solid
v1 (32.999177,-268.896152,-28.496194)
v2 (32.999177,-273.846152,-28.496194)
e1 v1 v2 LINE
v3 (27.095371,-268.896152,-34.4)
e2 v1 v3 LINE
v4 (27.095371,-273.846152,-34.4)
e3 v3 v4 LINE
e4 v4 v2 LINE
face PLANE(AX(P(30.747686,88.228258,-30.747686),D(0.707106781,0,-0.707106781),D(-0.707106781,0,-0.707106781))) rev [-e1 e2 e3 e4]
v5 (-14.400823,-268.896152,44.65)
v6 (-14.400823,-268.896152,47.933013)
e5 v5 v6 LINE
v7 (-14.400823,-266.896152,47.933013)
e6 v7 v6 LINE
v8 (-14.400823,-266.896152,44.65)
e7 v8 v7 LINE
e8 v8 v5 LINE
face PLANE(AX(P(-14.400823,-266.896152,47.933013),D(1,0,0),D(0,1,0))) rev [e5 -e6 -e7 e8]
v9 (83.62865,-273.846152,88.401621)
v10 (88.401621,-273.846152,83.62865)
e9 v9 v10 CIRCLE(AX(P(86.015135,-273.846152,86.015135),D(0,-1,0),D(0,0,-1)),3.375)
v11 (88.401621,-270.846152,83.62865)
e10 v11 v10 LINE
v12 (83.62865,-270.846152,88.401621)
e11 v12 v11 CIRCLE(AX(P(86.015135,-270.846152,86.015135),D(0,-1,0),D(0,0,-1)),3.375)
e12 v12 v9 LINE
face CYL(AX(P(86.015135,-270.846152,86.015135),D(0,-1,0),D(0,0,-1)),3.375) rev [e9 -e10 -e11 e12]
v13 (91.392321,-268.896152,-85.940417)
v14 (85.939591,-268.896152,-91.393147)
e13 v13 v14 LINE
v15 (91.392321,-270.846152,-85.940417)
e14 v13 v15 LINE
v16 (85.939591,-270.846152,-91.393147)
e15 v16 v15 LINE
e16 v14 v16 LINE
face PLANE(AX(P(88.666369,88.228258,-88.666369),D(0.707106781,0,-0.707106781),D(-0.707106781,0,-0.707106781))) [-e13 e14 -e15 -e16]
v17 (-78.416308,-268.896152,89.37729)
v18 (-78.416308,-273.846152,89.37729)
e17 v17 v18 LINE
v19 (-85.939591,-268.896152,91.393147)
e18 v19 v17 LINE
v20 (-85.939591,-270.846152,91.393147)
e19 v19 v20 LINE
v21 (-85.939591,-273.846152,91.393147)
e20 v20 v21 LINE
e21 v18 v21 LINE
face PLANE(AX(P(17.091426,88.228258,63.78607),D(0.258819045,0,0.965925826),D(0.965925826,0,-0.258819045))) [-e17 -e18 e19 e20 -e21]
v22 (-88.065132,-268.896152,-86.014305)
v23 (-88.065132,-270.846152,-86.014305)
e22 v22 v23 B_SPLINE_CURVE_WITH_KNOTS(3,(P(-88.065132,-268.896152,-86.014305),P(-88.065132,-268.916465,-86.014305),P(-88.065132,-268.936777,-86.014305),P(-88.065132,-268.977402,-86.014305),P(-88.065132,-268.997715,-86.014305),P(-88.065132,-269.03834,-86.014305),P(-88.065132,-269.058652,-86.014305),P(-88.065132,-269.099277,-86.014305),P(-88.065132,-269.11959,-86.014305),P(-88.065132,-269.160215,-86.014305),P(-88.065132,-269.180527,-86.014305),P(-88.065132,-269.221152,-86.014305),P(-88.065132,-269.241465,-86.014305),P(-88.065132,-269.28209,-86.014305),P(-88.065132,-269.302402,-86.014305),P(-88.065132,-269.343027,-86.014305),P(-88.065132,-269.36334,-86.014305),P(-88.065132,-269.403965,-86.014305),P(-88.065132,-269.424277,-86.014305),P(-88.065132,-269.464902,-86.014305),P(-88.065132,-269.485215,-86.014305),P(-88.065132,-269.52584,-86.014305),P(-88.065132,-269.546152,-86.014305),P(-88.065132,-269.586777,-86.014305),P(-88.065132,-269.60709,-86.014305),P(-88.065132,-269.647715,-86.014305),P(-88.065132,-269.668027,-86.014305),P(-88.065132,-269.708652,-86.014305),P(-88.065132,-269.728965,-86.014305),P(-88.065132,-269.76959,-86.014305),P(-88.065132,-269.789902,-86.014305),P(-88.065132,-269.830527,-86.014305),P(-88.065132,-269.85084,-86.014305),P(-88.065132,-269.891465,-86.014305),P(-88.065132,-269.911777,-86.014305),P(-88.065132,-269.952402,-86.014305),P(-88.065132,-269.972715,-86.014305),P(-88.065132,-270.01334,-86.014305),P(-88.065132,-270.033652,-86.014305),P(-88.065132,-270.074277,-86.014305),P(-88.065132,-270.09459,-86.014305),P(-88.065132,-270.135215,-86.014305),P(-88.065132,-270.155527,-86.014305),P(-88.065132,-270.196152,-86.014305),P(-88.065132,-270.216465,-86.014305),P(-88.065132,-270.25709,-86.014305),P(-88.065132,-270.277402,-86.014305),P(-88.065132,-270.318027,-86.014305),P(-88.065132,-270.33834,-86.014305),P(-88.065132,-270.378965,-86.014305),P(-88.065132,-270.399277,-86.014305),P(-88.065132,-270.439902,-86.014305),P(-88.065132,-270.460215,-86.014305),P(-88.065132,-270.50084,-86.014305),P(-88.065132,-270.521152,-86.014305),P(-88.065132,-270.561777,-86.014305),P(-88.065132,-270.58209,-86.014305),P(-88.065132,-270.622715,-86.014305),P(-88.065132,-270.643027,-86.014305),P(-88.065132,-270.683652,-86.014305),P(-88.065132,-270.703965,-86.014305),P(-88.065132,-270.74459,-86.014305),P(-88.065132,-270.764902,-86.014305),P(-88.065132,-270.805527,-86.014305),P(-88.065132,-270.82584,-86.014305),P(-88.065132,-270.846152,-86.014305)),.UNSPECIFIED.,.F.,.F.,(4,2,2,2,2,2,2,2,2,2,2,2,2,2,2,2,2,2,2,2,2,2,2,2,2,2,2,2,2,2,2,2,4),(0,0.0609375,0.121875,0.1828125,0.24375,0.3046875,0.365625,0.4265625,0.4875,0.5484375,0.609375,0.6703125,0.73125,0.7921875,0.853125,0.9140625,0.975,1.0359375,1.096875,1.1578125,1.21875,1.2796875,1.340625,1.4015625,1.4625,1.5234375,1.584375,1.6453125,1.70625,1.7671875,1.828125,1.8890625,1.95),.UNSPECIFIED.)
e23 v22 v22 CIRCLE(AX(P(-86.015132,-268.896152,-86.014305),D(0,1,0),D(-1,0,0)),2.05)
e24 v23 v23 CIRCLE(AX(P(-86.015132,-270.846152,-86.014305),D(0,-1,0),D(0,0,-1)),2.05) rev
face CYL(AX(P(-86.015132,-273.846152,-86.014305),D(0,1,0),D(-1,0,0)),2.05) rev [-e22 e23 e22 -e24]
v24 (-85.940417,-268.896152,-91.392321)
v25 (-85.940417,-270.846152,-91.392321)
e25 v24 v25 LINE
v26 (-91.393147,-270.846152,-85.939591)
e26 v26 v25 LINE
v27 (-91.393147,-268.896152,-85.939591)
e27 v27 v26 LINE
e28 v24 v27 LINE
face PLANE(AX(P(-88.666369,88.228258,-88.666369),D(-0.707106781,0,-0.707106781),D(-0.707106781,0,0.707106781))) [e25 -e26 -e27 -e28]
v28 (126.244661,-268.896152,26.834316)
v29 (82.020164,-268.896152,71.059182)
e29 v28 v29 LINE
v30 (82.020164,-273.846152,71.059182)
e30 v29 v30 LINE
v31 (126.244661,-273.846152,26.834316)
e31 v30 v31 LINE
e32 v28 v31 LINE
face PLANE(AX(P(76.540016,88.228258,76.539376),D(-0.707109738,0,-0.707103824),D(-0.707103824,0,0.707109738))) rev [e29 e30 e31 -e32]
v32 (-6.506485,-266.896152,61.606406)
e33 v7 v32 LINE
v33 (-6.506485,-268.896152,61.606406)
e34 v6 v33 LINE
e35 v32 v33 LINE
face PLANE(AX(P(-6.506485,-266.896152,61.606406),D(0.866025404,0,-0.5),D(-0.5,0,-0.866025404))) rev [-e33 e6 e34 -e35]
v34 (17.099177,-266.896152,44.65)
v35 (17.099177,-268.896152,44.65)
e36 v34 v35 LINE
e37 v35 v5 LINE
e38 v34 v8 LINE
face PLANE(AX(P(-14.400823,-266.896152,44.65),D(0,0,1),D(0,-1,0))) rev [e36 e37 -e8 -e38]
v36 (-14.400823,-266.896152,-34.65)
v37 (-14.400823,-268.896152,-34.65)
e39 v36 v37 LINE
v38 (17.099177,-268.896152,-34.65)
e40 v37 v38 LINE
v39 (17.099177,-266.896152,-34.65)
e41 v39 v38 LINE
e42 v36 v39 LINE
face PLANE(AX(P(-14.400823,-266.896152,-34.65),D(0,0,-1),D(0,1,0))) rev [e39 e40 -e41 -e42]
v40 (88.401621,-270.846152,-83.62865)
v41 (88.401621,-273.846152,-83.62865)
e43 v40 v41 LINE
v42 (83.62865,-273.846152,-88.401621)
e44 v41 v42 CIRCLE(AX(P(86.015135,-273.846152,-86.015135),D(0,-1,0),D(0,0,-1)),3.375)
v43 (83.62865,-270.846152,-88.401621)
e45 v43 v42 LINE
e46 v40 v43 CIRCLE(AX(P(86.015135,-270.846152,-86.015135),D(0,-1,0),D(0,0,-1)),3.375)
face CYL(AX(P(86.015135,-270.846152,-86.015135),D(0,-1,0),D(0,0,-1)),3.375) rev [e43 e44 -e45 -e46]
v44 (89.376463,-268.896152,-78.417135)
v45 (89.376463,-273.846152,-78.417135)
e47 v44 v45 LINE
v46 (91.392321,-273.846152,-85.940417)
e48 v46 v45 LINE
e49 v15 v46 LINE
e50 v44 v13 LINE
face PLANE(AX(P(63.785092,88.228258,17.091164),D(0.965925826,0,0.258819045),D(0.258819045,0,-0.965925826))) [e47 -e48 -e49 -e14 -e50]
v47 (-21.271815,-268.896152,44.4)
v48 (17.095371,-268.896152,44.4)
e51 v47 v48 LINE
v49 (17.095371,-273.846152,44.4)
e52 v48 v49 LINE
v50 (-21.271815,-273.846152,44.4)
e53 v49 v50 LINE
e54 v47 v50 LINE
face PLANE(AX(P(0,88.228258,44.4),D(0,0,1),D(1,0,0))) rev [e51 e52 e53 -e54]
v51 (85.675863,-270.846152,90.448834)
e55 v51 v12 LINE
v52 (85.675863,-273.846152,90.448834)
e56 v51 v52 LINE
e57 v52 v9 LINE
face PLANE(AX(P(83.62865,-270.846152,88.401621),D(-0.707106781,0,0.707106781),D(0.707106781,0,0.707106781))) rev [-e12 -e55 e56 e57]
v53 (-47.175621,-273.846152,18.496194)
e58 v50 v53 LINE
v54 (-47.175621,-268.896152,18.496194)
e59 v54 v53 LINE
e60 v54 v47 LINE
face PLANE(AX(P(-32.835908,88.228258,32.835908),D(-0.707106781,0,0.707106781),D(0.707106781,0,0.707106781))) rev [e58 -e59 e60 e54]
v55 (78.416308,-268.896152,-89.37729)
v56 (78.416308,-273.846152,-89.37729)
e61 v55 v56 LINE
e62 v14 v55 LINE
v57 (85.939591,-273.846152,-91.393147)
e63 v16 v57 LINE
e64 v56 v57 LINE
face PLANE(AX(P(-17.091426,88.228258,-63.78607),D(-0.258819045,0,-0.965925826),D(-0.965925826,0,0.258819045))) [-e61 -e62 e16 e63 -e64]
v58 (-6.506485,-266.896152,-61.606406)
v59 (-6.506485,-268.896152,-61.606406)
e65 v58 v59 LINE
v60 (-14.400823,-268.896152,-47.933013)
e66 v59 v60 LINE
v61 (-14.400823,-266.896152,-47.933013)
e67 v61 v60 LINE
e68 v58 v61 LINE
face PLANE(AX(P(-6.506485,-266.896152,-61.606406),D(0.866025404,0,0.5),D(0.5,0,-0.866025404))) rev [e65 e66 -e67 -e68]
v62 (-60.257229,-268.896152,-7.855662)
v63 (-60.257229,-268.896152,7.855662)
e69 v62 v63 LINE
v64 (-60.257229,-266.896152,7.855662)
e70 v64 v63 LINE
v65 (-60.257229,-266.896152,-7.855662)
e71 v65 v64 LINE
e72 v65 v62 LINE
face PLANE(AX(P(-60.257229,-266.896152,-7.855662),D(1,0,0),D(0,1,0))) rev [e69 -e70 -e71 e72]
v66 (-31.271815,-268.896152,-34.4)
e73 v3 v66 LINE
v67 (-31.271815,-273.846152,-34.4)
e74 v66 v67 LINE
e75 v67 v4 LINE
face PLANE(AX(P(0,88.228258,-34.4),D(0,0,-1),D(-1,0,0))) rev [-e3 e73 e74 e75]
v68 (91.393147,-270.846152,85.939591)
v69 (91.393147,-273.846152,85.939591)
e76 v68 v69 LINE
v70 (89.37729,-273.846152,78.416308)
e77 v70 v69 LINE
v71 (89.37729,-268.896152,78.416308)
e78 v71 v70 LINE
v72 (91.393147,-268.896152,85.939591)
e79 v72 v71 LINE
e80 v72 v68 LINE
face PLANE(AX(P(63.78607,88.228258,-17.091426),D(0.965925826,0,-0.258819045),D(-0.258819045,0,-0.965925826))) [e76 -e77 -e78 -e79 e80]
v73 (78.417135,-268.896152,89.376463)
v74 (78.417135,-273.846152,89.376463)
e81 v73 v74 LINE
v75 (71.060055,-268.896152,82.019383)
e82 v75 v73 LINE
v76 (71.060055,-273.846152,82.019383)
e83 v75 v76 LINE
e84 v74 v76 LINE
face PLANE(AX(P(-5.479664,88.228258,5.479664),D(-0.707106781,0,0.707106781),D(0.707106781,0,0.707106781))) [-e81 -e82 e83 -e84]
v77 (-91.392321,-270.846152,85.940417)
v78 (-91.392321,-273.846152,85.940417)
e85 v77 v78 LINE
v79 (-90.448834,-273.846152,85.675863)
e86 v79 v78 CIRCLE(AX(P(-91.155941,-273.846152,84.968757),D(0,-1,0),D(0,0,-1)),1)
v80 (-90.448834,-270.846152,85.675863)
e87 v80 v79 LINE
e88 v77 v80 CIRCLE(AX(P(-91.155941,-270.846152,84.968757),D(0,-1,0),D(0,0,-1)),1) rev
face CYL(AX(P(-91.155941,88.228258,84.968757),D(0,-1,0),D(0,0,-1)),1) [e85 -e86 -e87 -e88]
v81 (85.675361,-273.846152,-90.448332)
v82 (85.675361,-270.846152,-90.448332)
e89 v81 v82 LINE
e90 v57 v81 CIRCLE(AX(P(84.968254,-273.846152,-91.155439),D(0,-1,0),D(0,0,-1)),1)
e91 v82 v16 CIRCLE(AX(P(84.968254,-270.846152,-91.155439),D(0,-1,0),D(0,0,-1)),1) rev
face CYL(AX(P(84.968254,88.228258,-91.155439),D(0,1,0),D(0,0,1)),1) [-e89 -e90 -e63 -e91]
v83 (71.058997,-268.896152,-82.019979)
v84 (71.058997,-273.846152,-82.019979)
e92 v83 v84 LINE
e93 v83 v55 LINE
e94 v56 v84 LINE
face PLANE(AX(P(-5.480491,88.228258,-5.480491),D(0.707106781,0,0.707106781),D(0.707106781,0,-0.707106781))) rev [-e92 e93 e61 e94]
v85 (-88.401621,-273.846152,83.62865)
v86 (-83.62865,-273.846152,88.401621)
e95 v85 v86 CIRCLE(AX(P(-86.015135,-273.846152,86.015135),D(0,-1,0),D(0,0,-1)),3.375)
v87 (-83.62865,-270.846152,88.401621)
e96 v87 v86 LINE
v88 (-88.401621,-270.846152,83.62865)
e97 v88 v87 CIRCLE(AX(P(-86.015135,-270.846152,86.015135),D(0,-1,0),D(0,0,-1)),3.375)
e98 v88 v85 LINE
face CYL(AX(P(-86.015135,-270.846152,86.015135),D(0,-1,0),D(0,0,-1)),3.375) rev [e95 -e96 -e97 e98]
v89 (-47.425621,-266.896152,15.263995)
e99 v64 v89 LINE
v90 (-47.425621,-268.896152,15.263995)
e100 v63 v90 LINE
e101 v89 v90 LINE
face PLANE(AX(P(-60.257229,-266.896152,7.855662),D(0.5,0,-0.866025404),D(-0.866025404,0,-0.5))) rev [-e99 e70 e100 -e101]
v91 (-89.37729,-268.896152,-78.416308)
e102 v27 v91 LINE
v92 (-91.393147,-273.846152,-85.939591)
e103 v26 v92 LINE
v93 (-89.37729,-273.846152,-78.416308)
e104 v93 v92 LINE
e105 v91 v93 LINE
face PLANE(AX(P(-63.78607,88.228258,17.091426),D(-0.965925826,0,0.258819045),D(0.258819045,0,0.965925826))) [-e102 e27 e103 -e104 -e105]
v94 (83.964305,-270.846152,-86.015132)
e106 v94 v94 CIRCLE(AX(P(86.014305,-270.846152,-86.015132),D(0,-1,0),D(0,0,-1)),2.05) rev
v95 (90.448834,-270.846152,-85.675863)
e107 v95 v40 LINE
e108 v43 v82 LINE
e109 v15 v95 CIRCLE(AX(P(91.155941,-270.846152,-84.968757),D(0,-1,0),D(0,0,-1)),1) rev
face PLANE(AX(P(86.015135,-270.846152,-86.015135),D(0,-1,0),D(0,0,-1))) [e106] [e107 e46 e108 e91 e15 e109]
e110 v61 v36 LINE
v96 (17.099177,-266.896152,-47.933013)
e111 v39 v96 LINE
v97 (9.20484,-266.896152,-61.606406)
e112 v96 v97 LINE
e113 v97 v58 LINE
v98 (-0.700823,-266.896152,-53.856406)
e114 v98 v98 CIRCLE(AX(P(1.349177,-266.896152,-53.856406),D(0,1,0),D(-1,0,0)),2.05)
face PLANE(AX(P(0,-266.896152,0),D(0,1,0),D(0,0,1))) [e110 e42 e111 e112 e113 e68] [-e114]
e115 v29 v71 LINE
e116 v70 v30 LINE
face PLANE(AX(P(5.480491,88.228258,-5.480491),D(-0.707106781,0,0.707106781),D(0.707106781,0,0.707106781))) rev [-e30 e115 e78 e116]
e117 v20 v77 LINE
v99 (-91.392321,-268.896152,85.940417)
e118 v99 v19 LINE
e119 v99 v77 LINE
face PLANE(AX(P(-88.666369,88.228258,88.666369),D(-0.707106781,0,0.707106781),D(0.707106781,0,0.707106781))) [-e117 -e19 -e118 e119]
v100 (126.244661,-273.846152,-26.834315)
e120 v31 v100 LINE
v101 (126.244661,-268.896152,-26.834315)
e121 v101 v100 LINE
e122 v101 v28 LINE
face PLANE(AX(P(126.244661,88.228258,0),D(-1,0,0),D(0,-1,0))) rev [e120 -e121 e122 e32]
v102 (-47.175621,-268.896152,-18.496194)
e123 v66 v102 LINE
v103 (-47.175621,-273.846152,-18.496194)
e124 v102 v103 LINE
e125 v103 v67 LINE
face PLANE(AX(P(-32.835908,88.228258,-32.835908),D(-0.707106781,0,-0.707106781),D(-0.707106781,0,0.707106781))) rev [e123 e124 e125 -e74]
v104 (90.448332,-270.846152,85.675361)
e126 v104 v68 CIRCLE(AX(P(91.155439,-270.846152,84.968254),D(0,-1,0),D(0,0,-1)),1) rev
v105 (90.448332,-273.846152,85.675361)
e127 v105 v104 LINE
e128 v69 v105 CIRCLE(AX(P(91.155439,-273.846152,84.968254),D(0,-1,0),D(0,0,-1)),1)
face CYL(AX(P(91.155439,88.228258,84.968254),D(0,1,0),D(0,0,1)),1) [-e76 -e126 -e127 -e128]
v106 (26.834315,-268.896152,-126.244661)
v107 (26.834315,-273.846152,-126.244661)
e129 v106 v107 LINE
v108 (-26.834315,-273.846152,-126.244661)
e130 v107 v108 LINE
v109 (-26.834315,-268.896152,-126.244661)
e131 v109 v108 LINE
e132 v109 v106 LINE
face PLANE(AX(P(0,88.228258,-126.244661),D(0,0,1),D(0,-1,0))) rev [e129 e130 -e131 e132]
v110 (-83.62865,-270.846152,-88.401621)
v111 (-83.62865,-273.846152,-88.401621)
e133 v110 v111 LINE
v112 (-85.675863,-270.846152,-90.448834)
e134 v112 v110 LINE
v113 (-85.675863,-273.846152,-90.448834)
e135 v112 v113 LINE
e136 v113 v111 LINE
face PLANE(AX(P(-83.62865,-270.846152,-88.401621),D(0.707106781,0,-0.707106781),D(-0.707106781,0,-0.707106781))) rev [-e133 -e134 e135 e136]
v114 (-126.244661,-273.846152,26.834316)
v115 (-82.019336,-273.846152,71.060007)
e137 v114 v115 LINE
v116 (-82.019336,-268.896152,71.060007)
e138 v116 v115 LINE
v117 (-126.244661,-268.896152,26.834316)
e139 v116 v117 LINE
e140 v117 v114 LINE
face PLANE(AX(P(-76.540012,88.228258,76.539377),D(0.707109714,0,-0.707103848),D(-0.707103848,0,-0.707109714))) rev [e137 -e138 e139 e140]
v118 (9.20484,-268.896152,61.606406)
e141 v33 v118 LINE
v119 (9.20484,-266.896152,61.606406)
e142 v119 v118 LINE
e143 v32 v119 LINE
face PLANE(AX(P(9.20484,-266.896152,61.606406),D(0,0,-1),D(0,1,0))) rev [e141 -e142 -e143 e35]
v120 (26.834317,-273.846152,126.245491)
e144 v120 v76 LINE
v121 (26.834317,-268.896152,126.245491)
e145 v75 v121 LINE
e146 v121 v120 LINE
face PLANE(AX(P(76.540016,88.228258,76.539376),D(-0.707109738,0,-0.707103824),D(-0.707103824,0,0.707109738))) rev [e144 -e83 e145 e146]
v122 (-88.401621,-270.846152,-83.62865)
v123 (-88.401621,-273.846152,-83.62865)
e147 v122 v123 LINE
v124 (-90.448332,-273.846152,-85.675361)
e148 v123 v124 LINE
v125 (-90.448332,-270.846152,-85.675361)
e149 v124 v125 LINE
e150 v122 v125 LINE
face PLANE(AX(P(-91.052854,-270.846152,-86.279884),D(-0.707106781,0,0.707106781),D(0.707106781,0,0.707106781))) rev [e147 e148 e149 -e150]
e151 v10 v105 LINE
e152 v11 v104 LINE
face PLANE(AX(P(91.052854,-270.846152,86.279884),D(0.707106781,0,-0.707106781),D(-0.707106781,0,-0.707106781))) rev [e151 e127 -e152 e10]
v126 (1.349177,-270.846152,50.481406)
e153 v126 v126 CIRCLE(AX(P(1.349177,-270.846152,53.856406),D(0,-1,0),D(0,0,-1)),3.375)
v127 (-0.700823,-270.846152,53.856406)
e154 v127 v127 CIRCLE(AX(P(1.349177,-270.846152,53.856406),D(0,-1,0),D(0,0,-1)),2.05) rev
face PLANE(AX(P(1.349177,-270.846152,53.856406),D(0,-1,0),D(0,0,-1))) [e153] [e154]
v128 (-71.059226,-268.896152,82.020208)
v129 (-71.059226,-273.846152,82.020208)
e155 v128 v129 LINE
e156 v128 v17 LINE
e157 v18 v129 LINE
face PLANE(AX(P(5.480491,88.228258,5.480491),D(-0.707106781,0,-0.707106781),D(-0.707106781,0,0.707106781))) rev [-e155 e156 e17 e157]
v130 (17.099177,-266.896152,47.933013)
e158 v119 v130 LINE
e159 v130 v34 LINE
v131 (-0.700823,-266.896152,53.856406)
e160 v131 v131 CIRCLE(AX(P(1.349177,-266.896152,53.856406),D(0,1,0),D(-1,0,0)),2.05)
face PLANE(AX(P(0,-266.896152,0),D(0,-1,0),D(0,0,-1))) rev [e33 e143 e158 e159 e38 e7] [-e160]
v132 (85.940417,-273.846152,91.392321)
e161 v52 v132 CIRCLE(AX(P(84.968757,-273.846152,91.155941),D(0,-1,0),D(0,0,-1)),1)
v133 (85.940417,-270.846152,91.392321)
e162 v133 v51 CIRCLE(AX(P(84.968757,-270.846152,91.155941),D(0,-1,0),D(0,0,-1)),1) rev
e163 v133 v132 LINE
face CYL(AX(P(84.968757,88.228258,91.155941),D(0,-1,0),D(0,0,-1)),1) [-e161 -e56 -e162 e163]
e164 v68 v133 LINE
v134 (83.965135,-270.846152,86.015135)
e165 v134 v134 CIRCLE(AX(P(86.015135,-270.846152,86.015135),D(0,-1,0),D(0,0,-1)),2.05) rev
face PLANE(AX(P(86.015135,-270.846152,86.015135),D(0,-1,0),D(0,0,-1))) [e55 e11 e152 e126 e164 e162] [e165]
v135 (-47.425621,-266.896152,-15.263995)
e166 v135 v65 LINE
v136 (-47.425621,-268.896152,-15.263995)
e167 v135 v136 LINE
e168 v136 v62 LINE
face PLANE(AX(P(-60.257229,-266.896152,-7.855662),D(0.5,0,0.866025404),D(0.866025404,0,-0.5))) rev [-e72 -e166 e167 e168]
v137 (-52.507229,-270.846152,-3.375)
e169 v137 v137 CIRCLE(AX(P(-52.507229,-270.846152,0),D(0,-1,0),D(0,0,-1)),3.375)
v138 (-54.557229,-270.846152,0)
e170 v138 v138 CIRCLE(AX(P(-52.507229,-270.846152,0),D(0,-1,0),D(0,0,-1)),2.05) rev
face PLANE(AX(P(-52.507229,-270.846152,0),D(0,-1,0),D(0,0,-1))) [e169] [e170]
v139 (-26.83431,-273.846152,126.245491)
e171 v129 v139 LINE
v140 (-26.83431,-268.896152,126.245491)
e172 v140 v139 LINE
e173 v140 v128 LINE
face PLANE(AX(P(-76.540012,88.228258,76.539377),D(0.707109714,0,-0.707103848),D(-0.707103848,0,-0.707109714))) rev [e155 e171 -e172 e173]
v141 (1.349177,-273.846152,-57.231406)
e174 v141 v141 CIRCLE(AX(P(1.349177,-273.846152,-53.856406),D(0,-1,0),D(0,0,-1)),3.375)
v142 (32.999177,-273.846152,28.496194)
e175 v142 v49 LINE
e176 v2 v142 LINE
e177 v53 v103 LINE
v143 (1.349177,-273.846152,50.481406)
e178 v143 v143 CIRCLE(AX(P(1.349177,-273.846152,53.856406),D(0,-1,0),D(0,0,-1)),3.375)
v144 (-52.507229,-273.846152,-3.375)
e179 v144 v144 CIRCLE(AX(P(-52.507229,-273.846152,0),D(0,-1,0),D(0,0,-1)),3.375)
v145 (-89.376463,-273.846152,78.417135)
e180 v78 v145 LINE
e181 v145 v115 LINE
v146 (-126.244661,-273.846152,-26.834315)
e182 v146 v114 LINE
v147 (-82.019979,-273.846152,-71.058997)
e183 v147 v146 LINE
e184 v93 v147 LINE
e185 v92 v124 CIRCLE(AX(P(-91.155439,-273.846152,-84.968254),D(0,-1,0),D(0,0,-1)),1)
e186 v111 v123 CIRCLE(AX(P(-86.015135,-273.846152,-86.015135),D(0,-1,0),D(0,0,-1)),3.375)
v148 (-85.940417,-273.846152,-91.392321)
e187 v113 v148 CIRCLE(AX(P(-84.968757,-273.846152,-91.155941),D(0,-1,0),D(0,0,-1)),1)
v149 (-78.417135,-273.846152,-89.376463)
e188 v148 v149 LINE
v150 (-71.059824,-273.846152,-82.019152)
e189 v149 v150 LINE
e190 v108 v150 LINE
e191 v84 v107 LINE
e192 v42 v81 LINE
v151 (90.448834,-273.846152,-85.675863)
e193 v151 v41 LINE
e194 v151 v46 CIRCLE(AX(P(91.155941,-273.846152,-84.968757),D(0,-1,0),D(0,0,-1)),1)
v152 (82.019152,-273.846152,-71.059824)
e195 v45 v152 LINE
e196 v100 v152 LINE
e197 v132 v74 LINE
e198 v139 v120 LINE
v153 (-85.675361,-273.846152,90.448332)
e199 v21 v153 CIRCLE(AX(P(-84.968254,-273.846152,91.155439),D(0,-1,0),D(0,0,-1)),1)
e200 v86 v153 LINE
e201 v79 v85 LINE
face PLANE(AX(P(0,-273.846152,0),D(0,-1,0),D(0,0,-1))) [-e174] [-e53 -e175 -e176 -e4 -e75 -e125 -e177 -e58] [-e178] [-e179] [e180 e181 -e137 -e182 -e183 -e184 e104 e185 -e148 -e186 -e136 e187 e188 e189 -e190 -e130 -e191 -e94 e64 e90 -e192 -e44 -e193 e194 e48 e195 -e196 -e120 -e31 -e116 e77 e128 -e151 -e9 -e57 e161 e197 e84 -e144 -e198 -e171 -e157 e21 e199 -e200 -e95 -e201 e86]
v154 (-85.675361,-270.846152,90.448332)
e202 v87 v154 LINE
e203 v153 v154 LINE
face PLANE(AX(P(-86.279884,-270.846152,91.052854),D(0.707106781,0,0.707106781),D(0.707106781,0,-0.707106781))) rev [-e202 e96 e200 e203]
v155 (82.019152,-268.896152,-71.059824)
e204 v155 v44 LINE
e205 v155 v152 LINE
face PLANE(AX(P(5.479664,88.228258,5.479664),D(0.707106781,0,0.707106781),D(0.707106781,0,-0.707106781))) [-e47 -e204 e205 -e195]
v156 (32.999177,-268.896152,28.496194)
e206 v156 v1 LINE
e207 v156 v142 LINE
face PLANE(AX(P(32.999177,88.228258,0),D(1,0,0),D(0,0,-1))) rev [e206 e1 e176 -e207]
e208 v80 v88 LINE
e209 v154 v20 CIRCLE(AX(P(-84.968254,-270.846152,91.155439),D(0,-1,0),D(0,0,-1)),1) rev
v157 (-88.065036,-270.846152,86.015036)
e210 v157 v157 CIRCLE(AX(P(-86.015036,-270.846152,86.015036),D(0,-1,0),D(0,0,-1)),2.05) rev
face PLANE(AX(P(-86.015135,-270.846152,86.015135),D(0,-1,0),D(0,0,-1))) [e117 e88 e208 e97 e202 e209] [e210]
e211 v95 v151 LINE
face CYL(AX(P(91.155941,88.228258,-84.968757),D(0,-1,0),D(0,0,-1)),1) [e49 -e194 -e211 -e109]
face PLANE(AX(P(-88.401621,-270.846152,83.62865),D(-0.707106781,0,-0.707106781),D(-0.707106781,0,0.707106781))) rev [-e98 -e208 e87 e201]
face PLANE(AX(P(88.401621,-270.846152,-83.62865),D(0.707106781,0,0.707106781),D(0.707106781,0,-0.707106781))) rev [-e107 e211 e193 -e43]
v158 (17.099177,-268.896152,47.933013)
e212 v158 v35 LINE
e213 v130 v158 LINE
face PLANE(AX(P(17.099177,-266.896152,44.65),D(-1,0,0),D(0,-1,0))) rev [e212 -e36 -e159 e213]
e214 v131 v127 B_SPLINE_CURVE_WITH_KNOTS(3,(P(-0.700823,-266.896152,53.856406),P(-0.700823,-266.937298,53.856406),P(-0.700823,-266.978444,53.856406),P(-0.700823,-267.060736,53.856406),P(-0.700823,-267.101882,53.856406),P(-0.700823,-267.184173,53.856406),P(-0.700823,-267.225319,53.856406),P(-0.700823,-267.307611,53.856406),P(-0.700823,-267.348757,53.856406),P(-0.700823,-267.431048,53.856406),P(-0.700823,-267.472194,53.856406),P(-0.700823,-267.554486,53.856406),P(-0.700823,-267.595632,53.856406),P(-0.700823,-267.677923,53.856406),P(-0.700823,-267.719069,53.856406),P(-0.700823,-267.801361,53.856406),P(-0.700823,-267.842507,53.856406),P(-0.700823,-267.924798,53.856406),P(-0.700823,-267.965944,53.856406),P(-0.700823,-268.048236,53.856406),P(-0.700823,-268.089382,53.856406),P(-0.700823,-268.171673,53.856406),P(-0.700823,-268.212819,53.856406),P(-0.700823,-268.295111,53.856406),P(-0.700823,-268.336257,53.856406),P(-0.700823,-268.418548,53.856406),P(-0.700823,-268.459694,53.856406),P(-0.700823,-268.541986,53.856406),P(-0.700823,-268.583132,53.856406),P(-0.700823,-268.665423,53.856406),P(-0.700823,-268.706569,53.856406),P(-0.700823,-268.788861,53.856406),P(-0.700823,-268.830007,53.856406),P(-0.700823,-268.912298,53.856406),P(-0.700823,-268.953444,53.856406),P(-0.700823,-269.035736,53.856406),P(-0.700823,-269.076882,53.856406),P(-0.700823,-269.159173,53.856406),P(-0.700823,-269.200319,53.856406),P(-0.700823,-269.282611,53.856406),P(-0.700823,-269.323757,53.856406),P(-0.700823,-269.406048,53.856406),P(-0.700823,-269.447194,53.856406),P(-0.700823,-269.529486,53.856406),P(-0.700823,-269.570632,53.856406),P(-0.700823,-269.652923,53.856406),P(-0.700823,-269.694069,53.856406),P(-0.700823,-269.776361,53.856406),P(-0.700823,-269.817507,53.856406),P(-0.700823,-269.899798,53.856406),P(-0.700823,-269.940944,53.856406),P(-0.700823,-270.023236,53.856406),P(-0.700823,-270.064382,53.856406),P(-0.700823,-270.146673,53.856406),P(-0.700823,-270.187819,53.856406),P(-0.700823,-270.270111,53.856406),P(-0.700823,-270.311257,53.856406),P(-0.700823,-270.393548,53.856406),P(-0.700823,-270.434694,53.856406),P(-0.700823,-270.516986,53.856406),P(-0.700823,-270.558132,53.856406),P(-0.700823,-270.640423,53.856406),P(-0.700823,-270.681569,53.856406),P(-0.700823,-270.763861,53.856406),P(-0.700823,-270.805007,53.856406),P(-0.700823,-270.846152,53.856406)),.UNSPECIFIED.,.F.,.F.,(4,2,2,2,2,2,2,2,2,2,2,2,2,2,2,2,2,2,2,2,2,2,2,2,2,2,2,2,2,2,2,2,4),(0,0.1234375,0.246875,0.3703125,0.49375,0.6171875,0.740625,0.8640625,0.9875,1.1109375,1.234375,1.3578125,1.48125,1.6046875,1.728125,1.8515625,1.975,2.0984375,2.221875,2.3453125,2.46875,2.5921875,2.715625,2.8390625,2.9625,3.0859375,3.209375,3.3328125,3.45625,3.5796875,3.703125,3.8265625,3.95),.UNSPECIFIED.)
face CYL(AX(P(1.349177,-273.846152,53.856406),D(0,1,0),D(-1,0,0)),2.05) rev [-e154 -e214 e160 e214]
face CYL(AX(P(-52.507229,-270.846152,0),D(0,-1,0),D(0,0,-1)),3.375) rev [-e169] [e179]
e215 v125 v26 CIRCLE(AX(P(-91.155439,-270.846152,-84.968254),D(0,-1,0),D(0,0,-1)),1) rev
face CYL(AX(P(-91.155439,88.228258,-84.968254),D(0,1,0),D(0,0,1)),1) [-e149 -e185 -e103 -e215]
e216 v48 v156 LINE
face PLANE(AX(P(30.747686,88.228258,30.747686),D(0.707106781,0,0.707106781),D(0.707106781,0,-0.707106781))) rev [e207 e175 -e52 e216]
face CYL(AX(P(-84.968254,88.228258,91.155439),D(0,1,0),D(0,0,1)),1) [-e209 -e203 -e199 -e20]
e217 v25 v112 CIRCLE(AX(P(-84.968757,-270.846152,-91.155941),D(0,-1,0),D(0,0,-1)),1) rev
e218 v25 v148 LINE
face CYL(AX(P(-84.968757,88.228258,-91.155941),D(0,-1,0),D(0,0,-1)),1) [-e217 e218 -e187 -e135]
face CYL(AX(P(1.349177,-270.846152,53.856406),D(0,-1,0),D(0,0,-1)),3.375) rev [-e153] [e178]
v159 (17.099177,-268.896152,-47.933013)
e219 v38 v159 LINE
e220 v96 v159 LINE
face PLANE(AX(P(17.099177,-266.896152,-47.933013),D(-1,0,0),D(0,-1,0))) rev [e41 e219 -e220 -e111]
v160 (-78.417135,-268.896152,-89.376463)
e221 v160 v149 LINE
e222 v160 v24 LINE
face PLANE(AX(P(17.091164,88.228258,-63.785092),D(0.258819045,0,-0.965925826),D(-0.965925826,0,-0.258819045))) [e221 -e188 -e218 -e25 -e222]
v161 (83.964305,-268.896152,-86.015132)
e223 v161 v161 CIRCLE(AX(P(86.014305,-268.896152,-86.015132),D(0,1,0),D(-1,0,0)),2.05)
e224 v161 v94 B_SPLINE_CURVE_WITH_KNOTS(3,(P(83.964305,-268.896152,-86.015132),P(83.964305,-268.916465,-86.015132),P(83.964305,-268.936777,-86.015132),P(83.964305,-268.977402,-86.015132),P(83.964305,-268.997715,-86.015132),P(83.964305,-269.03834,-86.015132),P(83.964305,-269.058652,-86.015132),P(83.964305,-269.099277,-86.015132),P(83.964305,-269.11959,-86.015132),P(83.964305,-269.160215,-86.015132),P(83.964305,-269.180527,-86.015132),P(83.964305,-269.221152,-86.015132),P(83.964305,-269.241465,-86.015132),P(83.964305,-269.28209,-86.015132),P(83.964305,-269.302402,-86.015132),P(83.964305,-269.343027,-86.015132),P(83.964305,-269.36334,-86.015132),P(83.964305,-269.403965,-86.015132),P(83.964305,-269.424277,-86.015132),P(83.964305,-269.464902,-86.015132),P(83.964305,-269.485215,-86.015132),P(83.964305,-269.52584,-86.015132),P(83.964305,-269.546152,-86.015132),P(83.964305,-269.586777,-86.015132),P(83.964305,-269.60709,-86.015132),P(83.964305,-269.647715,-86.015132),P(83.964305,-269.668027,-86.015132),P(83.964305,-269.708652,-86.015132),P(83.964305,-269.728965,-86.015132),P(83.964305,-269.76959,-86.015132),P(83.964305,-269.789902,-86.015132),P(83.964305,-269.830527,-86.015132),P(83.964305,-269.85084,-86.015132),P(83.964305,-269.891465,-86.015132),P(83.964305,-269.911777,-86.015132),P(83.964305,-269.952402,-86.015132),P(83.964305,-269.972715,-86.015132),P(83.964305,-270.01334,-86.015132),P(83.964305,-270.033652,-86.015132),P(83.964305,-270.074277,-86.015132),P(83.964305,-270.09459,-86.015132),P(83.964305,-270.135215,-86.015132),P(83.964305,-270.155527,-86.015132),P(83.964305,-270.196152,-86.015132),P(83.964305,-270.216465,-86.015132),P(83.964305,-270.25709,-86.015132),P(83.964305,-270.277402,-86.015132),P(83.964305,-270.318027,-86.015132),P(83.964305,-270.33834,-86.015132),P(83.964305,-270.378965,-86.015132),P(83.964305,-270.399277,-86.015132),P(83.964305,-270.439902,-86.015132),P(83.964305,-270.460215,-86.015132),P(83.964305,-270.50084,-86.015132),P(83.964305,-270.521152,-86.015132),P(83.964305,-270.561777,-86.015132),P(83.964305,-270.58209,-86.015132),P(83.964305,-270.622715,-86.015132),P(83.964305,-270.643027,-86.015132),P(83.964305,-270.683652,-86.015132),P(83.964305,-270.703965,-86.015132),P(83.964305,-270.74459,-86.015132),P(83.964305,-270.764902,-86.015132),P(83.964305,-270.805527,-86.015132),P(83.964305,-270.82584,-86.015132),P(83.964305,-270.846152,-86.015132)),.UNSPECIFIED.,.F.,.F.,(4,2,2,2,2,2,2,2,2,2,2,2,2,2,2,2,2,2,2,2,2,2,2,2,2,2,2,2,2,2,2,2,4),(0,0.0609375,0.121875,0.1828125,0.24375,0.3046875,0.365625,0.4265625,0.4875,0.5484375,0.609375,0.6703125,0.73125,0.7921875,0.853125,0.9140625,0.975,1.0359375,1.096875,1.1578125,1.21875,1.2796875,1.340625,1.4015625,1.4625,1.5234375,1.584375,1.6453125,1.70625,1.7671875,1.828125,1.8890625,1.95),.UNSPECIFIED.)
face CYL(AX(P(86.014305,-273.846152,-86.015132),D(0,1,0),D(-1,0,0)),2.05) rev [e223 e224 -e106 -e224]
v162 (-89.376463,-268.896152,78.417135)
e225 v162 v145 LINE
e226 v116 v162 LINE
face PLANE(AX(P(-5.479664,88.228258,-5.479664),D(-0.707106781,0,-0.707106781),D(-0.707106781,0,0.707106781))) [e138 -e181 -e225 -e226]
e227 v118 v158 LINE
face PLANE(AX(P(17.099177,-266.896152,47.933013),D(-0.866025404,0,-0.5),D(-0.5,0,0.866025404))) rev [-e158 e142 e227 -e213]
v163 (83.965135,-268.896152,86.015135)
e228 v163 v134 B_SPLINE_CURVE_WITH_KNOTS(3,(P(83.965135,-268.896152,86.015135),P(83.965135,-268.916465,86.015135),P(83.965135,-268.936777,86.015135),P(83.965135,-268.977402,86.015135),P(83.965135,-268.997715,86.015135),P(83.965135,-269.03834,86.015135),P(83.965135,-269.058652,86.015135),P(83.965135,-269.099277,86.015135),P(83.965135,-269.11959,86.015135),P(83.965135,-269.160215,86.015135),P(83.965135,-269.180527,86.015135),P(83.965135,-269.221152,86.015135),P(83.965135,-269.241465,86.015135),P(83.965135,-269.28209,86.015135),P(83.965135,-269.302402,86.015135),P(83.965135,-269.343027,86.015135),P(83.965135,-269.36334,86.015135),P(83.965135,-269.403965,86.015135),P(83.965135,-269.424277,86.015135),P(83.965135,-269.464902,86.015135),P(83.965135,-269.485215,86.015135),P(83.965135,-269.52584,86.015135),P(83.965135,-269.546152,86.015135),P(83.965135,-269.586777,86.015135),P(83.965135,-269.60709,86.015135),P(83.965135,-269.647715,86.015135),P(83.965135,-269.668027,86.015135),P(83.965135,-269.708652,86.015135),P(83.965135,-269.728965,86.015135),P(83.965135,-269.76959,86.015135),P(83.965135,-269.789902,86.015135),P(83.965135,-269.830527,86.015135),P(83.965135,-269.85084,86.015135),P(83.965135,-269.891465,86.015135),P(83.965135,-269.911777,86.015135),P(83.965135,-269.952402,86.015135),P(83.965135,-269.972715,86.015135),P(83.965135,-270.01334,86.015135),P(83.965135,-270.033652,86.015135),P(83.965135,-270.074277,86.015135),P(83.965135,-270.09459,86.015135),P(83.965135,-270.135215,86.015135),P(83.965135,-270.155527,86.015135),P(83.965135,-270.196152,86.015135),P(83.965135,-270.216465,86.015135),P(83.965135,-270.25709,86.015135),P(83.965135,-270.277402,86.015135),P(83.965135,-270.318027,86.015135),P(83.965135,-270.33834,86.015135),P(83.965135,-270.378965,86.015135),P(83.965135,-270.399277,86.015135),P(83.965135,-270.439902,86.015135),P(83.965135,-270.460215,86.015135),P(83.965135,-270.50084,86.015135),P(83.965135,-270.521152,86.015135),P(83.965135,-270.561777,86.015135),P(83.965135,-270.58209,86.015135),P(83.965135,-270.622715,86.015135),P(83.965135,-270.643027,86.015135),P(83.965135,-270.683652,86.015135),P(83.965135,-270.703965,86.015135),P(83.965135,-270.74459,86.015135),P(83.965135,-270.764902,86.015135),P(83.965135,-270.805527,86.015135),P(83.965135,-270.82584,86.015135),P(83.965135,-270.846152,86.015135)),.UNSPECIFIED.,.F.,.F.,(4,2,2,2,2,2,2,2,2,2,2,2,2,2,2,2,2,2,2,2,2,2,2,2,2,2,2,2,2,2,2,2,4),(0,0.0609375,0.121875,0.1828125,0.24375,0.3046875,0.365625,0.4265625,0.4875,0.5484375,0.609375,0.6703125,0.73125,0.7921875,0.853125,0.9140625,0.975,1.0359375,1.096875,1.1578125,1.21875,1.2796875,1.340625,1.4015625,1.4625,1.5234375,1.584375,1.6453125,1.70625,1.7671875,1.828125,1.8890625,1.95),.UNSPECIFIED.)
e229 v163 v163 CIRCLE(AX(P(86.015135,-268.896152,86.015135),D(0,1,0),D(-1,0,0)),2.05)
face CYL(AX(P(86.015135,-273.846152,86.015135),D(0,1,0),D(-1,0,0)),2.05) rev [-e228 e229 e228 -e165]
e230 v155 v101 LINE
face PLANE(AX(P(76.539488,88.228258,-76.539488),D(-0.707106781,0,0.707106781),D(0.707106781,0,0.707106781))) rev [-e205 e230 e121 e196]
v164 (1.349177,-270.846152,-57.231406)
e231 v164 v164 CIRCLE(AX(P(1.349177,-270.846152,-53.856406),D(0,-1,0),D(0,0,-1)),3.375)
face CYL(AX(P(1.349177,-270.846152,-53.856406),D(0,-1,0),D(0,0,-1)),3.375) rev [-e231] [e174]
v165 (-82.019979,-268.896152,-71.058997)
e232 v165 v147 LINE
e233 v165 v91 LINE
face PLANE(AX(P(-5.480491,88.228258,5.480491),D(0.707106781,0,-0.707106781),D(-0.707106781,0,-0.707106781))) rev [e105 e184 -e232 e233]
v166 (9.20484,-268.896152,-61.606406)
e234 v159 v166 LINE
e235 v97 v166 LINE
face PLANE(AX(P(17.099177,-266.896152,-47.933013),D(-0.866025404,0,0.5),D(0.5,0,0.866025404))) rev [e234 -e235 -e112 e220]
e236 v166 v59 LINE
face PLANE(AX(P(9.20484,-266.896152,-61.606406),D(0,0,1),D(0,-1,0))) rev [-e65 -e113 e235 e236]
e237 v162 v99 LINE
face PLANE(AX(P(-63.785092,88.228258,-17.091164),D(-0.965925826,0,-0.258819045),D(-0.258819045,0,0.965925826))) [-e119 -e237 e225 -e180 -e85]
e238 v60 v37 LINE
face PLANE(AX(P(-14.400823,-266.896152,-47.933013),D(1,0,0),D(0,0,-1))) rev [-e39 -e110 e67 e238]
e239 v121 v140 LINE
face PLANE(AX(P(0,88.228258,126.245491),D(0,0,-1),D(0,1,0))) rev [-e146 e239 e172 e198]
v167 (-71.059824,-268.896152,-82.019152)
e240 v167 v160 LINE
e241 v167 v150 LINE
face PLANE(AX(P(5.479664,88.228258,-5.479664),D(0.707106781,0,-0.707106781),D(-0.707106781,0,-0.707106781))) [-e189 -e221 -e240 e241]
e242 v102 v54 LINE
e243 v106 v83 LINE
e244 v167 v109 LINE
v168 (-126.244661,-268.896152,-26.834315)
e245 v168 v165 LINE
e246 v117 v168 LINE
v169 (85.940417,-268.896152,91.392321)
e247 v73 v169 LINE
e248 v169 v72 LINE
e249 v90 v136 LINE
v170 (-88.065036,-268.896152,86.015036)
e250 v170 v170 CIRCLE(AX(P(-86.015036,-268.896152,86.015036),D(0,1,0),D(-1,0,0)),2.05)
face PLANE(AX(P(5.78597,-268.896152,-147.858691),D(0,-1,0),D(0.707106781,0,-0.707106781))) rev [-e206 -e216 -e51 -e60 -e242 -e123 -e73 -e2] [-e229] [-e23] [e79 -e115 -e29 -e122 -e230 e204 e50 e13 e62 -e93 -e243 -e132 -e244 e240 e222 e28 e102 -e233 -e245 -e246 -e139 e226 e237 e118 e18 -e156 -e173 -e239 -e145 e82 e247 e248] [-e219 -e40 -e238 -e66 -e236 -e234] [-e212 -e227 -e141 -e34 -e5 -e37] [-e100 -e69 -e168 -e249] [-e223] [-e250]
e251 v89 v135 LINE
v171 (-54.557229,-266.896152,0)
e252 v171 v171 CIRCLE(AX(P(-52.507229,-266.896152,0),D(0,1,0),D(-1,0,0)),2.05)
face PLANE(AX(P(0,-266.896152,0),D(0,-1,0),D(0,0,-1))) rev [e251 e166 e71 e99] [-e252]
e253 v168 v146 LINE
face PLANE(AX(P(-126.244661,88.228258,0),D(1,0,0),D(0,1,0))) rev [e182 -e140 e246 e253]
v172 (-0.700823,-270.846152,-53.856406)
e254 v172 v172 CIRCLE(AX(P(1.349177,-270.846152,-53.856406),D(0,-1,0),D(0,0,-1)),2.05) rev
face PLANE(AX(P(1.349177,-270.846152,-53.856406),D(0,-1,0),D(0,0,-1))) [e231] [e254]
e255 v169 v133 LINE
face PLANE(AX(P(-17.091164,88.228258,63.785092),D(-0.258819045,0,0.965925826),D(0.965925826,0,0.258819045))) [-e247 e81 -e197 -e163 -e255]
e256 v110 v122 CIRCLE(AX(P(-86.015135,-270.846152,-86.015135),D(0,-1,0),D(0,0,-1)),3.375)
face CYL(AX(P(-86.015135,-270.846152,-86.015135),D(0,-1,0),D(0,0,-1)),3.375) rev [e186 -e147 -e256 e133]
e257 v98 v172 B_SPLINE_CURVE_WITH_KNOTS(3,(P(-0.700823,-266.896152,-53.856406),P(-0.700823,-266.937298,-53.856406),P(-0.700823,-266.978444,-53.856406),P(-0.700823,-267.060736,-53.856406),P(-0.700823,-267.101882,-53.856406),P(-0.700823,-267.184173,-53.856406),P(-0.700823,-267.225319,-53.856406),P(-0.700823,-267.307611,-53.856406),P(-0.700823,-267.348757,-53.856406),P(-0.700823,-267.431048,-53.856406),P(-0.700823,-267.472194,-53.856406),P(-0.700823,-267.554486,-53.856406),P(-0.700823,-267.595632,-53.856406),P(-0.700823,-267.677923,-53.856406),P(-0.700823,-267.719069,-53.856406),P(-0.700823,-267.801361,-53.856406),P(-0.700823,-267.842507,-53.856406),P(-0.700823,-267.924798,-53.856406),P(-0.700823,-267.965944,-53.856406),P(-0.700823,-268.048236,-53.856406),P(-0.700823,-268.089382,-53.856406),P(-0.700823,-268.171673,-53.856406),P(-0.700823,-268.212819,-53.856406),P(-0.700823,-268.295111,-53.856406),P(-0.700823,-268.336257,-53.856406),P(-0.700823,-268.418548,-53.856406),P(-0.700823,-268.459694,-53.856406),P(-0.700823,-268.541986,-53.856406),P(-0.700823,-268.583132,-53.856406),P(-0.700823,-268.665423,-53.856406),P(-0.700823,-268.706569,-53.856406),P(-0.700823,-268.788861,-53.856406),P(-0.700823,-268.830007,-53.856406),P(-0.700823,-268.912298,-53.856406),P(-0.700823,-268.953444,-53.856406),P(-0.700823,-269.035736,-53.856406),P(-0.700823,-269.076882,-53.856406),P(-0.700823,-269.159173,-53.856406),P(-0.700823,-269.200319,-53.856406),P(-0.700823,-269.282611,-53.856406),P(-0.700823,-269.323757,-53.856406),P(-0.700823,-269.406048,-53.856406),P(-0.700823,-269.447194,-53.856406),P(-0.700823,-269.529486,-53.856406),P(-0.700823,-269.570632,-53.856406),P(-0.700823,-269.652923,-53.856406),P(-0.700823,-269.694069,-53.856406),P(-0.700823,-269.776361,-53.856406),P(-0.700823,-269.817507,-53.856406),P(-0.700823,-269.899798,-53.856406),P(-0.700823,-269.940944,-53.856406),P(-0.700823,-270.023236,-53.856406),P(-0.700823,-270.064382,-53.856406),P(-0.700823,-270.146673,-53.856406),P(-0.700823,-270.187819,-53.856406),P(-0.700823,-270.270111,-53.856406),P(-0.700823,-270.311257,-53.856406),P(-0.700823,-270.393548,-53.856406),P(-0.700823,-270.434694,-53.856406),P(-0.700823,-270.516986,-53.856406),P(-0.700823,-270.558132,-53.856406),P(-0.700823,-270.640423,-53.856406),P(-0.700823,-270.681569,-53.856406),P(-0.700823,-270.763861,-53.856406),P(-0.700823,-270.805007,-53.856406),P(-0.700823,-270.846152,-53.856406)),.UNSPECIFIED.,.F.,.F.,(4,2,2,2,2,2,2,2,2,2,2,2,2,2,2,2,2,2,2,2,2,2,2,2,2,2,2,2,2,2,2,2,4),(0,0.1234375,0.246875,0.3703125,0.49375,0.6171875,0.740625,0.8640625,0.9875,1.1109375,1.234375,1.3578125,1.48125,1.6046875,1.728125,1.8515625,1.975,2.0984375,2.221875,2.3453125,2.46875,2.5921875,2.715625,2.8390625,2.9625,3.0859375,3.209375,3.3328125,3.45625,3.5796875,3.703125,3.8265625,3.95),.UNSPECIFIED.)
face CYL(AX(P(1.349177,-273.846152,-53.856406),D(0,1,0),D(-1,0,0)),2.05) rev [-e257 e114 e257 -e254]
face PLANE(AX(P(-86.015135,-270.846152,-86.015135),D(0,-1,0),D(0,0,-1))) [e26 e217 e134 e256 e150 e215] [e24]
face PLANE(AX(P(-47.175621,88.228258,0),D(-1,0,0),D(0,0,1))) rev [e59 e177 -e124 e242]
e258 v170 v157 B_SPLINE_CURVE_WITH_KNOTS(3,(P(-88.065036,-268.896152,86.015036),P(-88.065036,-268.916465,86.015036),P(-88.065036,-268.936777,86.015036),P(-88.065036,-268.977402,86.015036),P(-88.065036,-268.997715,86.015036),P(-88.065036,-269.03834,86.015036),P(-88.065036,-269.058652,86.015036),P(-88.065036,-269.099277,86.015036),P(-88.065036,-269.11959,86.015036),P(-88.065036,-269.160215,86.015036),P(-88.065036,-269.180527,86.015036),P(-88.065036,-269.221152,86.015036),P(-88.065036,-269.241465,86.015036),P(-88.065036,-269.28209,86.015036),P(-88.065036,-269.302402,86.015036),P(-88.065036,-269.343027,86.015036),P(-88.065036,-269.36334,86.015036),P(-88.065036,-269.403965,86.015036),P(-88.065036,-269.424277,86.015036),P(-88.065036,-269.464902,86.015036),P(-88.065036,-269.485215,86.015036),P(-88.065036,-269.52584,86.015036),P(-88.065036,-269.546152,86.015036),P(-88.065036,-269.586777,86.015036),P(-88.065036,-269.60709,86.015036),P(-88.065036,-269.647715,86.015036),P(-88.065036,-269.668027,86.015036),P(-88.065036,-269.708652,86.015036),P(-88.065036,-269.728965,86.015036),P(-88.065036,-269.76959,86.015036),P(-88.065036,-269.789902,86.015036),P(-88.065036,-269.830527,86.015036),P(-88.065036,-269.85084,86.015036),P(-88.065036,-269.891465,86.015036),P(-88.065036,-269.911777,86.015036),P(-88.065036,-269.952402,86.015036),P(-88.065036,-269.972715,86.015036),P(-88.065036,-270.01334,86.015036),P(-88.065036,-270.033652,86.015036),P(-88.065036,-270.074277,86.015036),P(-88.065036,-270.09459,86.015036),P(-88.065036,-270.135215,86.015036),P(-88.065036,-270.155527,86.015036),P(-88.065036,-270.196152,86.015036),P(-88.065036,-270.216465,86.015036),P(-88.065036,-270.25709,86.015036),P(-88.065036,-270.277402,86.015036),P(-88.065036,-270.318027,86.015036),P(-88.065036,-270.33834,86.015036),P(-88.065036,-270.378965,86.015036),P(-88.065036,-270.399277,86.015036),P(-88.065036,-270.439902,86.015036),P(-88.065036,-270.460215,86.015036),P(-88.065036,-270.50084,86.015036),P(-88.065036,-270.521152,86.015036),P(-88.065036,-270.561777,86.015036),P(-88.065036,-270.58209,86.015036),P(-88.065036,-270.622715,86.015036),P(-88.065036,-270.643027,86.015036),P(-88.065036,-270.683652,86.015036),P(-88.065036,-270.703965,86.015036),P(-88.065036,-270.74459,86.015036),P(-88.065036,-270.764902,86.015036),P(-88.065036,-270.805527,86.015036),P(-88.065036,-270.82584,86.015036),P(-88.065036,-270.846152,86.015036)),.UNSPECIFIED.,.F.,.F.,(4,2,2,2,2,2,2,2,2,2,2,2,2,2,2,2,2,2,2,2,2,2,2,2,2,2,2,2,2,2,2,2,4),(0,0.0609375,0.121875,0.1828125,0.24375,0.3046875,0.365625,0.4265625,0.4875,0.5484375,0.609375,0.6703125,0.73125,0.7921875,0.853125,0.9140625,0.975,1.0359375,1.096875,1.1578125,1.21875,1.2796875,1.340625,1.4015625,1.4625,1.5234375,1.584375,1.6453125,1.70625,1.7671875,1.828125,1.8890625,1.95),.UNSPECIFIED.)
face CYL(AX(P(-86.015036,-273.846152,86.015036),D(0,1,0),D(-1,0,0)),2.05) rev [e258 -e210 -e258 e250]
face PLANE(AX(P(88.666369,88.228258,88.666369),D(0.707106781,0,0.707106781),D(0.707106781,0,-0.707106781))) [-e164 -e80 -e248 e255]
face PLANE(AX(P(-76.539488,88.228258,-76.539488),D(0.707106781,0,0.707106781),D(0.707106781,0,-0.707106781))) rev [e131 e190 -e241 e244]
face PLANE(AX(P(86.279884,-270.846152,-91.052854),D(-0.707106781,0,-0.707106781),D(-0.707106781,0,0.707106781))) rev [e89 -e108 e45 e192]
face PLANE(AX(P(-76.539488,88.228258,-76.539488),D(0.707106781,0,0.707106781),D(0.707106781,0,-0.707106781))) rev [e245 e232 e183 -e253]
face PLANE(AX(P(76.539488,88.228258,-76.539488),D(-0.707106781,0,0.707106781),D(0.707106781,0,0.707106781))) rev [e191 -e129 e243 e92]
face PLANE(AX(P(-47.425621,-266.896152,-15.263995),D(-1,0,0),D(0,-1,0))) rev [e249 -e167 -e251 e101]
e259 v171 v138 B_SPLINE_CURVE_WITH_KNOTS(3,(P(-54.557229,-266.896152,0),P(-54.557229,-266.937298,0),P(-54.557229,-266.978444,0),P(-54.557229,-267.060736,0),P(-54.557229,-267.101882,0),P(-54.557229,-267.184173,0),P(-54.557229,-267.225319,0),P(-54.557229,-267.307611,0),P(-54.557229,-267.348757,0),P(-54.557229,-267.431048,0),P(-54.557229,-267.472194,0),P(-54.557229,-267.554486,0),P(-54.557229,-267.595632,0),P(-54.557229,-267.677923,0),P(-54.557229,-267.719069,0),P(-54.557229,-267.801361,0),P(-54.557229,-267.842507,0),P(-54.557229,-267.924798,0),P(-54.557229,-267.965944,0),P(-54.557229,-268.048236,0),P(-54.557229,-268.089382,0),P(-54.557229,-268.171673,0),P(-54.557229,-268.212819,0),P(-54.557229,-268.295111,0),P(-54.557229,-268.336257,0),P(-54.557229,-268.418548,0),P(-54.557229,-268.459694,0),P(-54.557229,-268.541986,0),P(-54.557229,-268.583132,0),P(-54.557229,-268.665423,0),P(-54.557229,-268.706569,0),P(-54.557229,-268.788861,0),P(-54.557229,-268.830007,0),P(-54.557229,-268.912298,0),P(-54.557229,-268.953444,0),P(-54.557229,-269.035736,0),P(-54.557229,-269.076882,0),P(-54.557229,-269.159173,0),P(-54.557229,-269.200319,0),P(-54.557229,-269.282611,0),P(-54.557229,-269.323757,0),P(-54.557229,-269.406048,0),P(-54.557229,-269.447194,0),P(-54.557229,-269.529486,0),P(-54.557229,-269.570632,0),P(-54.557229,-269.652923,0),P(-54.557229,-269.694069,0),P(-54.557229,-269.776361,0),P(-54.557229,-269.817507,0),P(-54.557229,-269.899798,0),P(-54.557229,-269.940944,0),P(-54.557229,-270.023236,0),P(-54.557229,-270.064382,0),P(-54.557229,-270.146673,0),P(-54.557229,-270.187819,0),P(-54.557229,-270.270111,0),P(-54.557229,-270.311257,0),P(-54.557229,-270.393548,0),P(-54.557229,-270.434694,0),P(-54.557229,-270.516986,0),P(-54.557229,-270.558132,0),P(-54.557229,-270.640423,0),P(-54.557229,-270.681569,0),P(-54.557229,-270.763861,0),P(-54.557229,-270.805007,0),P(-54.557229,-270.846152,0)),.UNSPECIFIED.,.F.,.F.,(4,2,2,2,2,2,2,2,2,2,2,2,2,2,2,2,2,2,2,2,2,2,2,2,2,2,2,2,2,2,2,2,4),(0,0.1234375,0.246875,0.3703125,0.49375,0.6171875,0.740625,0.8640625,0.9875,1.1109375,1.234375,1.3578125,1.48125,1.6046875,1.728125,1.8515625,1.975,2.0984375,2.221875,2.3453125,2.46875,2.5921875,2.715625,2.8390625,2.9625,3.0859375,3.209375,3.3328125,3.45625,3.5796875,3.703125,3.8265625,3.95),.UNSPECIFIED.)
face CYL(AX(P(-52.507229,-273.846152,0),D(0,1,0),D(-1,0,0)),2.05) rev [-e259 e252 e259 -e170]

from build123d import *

# Parameters (mm, degrees)
BOSS_EXTRUDE1_DEPTH = 4.95
SKETCH2_R           = 2.05
CUT_EXTRUDE1_DEPTH  = 179.606105426
BOSS_EXTRUDE2_START = 2
SKETCH4_R           = 2.05
BOSS_EXTRUDE2_DEPTH = 2
SKETCH5_R           = 3.375
CUT_EXTRUDE2_DEPTH  = 3
FILLET1_R           = 1


with BuildPart() as part:
    # Sketch1 → Boss-Extrude1 (new body)
    with BuildSketch(Plane(origin=(0, -273.846152423, 0), x_dir=(-1, 0, 0), z_dir=(0, -1, 0))):
        Polygon((82.019978644, 71.058996872), (82.302821357, 71.341839584), (89.377289978, 78.416308206), (91.393147439, 85.939590671), (85.940417335, 91.392320775), (78.41713487, 89.376463314), (71.342666248, 82.301994692), (71.059823536, 82.01915198), (26.834314575, 126.244660941), (-26.834314575, 126.244660941), (-71.058996872, 82.019978644), (-71.341839584, 82.302821357), (-78.416308206, 89.377289978), (-85.939590671, 91.393147439), (-91.392320775, 85.940417335), (-89.376463314, 78.41713487), (-82.301994692, 71.342666248), (-82.01915198, 71.059823536), (-126.244660941, 26.834314575), (-126.244660941, -26.834315555), (-82.020164054, -71.059182282), (-82.302821357, -71.341839584), (-89.377289978, -78.416308206), (-91.393147439, -85.939590671), (-85.940417335, -91.392320775), (-78.41713487, -89.376463314), (-71.342666248, -82.301994692), (-71.060054774, -82.019383219), (-26.834316916, -126.245490927), (26.834310282, -126.245490927), (71.059226271, -82.020208043), (71.341839584, -82.302821357), (78.416308206, -89.377289978), (85.939590671, -91.393147439), (91.392320775, -85.940417335), (89.376463314, -78.41713487), (82.301994692, -71.342666248), (82.019335916, -71.060007471), (126.244660941, -26.834315547), (126.244660941, 26.834314575), align=None)
        Polygon((-32.999177325, -28.496194078), (-32.999177325, -5.25), (-32.999177325, 5.25), (-32.999177325, 28.496194078), (-27.095371402, 34.4), (31.271815024, 34.4), (47.175620946, 18.496194078), (47.175620946, -18.496194078), (21.271815024, -44.4), (-17.095371403, -44.4), align=None, mode=Mode.SUBTRACT)
    extrude(amount=-BOSS_EXTRUDE1_DEPTH)

    # Sketch2 → Cut-Extrude1 (cut, through all)
    with BuildSketch(Plane(origin=(0, -268.896152423, 0), x_dir=(1, 0, 0), z_dir=(0, 1, 0))):
        with Locations(Location((-86.015131958, 86.014305294, 0), (0, 0, 180))):
            Circle(SKETCH2_R)
        with Locations(Location((86.014305294, 86.015131958, 0), (0, 0, 180))):
            Circle(SKETCH2_R)
        with Locations(Location((86.015135278, -86.01513528, 0), (0, 0, 180))):
            Circle(SKETCH2_R)
        with Locations(Location((-86.015036236, -86.015036236, 0), (0, 0, 180))):
            Circle(SKETCH2_R)
        with Locations(Location((1.349177325, 53.85640646, 0), (0, 0, 180))):
            Circle(SKETCH2_R)
        with Locations(Location((-52.507229136, 0, 0), (0, 0, 180))):
            Circle(SKETCH2_R)
        with Locations(Location((1.349177325, -53.856406461, 0), (0, 0, 180))):
            Circle(SKETCH2_R)
    extrude(amount=-CUT_EXTRUDE1_DEPTH, mode=Mode.SUBTRACT)

    # Sketch4 → Boss-Extrude2 (add)
    # profile 1 of 3: a face of its own
    with BuildSketch(Plane(origin=(0, -268.896152423, 0), x_dir=(1, 0, 0), z_dir=(0, 1, 0)).offset(BOSS_EXTRUDE2_START)):
        Polygon((17.099177325, 47.933012702), (17.099177325, 34.65), (-14.400822675, 34.65), (-14.400822675, 47.933012702), (-6.506485108, 61.60640646), (9.204839757, 61.60640646), align=None)
        with Locations(Location((1.349177325, 53.85640646, 0), (0, 0, 180))):
            Circle(SKETCH4_R, mode=Mode.SUBTRACT)
    # profile 2 of 3: a face of its own
    with BuildSketch(Plane(origin=(0, -268.896152423, 0), x_dir=(1, 0, 0), z_dir=(0, 1, 0)).offset(BOSS_EXTRUDE2_START)):
        Polygon((-60.257229136, 7.855662432), (-60.257229136, -7.855662433), (-47.425620946, -15.263994875), (-47.425620946, 15.263994875), align=None)
        with Locations(Location((-52.507229136, 0, 0), (0, 0, 180))):
            Circle(SKETCH4_R, mode=Mode.SUBTRACT)
    # profile 3 of 3: a face of its own
    with BuildSketch(Plane(origin=(0, -268.896152423, 0), x_dir=(1, 0, 0), z_dir=(0, 1, 0)).offset(BOSS_EXTRUDE2_START)):
        Polygon((-14.400822675, -44.65), (17.099177325, -44.65), (17.099177325, -47.933012702), (9.204839758, -61.606406461), (-6.506485108, -61.606406461), (-14.400822675, -47.933012702), align=None)
        with Locations(Location((1.349177325, -53.856406461, 0), (0, 0, 180))):
            Circle(SKETCH4_R, mode=Mode.SUBTRACT)
    extrude(amount=-BOSS_EXTRUDE2_DEPTH)

    # Sketch5 → Cut-Extrude2 (cut)
    with BuildSketch(Plane.XZ.offset(273.846152423)):
        with Locations(Location((1.349177325, 53.856406461, 0), (0, 0, 270))):
            Circle(SKETCH5_R)
        with Locations(Location((-52.507229136, 0, 0), (0, 0, 270))):
            Circle(SKETCH5_R)
        with Locations(Location((1.349177325, -53.85640646, 0), (0, 0, 270))):
            Circle(SKETCH5_R)
        with BuildLine():
            Line((83.628649892, 88.401620667), (86.279883668, 91.052854443))
            Line((86.279883668, 91.052854443), (91.052854441, 86.27988367))
            Line((91.052854441, 86.27988367), (88.401620665, 83.628649894))
            ThreePointArc((88.401620665, 83.628649894), (83.628649892, 83.628649894), (83.628649892, 88.401620667))
        make_face()
        with BuildLine():
            Line((88.401620667, -83.628649892), (91.052854443, -86.279883668))
            Line((91.052854443, -86.279883668), (86.27988367, -91.052854441))
            Line((86.27988367, -91.052854441), (83.628649894, -88.401620665))
            ThreePointArc((83.628649894, -88.401620665), (83.628649894, -83.628649892), (88.401620667, -83.628649892))
        make_face()
        with BuildLine():
            Line((-83.628649892, -88.401620667), (-86.279883668, -91.052854443))
            Line((-86.279883668, -91.052854443), (-91.052854441, -86.27988367))
            Line((-91.052854441, -86.27988367), (-88.401620665, -83.628649894))
            ThreePointArc((-88.401620665, -83.628649894), (-83.628649892, -83.628649894), (-83.628649892, -88.401620667))
        make_face()
        with BuildLine():
            Line((-88.401620667, 83.628649892), (-91.052854443, 86.279883668))
            Line((-91.052854443, 86.279883668), (-86.27988367, 91.052854441))
            Line((-86.27988367, 91.052854441), (-83.628649894, 88.401620665))
            ThreePointArc((-83.628649894, 88.401620665), (-83.628649894, 83.628649892), (-88.401620667, 83.628649892))
        make_face()
    extrude(amount=-CUT_EXTRUDE2_DEPTH, mode=Mode.SUBTRACT)

    # Fillet1
    # the kernel refuses this fillet: 1 mm, written as the material it takes off along each edge
    with BuildSketch(Plane(origin=(86.27988367, -275.983462791, -91.052854441), x_dir=(-0.7071067811867837, 0, -0.7071067811863112), z_dir=(0, 1, 0)), Plane(origin=(-91.052854441, -275.983462791, -86.27988367), x_dir=(-0.7071067811863703, 0, 0.7071067811867247), z_dir=(0, 1, 0)), Plane(origin=(-86.27988367, -275.983462791, 91.052854441), x_dir=(0.7071067811867394, 0, 0.7071067811863555), z_dir=(0, 1, 0)), Plane(origin=(91.052854441, -275.983462791, 86.27988367), x_dir=(0.7071067811863704, 0, -0.7071067811867248), z_dir=(0, 1, 0))) as fillet1_piece_1:
        with BuildLine():
            CenterArc((1, 0.854924147), FILLET1_R, 180, 58.751355935)
            Line((0, 0.854924147), (-0.02, 0.854924147))
            Line((-0.02, 0.854924147), (-0.02, 0))
            Line((-0.02, 0), (0, -0.02))
            ThreePointArc((0, -0.02), (0.240623487, -0.02), (0.470871913, -0.017098483))
            Line((0.470871913, -0.017098483), (0.481246974, 0))
        make_face()
    extrude(amount=5.137310369, mode=Mode.SUBTRACT)
    with BuildSketch(Plane(origin=(91.052854443, -275.981686608, -86.279883668), x_dir=(0.7071067811863996, 0, 0.7071067811866956), z_dir=(0, 1, 0)), Plane(origin=(-86.279883668, -275.981686608, -91.052854443), x_dir=(0.7071067811866807, 0, -0.7071067811864143), z_dir=(0, 1, 0)), Plane(origin=(-91.052854443, -275.981686608, 86.279883668), x_dir=(-0.7071067811863847, 0, -0.7071067811867103), z_dir=(0, 1, 0)), Plane(origin=(86.279883668, -275.981686608, 91.052854443), x_dir=(-0.7071067811866955, 0, 0.7071067811863995), z_dir=(0, 1, 0))) as fillet1_piece_2:
        with BuildLine():
            CenterArc((1, -0.854213674), FILLET1_R, 121.327026837, 58.672973163)
            Line((0, -0.854213674), (-0.02, -0.854213674))
            Line((-0.02, -0.854213674), (-0.02, 0))
            Line((-0.02, 0), (0, 0.02))
            ThreePointArc((0, 0.02), (0.240038946, 0.02), (0.469679449, 0.017084273))
            Line((0.469679449, 0.017084273), (0.480077891, 0))
        make_face()
    extrude(amount=5.135534185, mode=Mode.SUBTRACT)


solid = part.part
